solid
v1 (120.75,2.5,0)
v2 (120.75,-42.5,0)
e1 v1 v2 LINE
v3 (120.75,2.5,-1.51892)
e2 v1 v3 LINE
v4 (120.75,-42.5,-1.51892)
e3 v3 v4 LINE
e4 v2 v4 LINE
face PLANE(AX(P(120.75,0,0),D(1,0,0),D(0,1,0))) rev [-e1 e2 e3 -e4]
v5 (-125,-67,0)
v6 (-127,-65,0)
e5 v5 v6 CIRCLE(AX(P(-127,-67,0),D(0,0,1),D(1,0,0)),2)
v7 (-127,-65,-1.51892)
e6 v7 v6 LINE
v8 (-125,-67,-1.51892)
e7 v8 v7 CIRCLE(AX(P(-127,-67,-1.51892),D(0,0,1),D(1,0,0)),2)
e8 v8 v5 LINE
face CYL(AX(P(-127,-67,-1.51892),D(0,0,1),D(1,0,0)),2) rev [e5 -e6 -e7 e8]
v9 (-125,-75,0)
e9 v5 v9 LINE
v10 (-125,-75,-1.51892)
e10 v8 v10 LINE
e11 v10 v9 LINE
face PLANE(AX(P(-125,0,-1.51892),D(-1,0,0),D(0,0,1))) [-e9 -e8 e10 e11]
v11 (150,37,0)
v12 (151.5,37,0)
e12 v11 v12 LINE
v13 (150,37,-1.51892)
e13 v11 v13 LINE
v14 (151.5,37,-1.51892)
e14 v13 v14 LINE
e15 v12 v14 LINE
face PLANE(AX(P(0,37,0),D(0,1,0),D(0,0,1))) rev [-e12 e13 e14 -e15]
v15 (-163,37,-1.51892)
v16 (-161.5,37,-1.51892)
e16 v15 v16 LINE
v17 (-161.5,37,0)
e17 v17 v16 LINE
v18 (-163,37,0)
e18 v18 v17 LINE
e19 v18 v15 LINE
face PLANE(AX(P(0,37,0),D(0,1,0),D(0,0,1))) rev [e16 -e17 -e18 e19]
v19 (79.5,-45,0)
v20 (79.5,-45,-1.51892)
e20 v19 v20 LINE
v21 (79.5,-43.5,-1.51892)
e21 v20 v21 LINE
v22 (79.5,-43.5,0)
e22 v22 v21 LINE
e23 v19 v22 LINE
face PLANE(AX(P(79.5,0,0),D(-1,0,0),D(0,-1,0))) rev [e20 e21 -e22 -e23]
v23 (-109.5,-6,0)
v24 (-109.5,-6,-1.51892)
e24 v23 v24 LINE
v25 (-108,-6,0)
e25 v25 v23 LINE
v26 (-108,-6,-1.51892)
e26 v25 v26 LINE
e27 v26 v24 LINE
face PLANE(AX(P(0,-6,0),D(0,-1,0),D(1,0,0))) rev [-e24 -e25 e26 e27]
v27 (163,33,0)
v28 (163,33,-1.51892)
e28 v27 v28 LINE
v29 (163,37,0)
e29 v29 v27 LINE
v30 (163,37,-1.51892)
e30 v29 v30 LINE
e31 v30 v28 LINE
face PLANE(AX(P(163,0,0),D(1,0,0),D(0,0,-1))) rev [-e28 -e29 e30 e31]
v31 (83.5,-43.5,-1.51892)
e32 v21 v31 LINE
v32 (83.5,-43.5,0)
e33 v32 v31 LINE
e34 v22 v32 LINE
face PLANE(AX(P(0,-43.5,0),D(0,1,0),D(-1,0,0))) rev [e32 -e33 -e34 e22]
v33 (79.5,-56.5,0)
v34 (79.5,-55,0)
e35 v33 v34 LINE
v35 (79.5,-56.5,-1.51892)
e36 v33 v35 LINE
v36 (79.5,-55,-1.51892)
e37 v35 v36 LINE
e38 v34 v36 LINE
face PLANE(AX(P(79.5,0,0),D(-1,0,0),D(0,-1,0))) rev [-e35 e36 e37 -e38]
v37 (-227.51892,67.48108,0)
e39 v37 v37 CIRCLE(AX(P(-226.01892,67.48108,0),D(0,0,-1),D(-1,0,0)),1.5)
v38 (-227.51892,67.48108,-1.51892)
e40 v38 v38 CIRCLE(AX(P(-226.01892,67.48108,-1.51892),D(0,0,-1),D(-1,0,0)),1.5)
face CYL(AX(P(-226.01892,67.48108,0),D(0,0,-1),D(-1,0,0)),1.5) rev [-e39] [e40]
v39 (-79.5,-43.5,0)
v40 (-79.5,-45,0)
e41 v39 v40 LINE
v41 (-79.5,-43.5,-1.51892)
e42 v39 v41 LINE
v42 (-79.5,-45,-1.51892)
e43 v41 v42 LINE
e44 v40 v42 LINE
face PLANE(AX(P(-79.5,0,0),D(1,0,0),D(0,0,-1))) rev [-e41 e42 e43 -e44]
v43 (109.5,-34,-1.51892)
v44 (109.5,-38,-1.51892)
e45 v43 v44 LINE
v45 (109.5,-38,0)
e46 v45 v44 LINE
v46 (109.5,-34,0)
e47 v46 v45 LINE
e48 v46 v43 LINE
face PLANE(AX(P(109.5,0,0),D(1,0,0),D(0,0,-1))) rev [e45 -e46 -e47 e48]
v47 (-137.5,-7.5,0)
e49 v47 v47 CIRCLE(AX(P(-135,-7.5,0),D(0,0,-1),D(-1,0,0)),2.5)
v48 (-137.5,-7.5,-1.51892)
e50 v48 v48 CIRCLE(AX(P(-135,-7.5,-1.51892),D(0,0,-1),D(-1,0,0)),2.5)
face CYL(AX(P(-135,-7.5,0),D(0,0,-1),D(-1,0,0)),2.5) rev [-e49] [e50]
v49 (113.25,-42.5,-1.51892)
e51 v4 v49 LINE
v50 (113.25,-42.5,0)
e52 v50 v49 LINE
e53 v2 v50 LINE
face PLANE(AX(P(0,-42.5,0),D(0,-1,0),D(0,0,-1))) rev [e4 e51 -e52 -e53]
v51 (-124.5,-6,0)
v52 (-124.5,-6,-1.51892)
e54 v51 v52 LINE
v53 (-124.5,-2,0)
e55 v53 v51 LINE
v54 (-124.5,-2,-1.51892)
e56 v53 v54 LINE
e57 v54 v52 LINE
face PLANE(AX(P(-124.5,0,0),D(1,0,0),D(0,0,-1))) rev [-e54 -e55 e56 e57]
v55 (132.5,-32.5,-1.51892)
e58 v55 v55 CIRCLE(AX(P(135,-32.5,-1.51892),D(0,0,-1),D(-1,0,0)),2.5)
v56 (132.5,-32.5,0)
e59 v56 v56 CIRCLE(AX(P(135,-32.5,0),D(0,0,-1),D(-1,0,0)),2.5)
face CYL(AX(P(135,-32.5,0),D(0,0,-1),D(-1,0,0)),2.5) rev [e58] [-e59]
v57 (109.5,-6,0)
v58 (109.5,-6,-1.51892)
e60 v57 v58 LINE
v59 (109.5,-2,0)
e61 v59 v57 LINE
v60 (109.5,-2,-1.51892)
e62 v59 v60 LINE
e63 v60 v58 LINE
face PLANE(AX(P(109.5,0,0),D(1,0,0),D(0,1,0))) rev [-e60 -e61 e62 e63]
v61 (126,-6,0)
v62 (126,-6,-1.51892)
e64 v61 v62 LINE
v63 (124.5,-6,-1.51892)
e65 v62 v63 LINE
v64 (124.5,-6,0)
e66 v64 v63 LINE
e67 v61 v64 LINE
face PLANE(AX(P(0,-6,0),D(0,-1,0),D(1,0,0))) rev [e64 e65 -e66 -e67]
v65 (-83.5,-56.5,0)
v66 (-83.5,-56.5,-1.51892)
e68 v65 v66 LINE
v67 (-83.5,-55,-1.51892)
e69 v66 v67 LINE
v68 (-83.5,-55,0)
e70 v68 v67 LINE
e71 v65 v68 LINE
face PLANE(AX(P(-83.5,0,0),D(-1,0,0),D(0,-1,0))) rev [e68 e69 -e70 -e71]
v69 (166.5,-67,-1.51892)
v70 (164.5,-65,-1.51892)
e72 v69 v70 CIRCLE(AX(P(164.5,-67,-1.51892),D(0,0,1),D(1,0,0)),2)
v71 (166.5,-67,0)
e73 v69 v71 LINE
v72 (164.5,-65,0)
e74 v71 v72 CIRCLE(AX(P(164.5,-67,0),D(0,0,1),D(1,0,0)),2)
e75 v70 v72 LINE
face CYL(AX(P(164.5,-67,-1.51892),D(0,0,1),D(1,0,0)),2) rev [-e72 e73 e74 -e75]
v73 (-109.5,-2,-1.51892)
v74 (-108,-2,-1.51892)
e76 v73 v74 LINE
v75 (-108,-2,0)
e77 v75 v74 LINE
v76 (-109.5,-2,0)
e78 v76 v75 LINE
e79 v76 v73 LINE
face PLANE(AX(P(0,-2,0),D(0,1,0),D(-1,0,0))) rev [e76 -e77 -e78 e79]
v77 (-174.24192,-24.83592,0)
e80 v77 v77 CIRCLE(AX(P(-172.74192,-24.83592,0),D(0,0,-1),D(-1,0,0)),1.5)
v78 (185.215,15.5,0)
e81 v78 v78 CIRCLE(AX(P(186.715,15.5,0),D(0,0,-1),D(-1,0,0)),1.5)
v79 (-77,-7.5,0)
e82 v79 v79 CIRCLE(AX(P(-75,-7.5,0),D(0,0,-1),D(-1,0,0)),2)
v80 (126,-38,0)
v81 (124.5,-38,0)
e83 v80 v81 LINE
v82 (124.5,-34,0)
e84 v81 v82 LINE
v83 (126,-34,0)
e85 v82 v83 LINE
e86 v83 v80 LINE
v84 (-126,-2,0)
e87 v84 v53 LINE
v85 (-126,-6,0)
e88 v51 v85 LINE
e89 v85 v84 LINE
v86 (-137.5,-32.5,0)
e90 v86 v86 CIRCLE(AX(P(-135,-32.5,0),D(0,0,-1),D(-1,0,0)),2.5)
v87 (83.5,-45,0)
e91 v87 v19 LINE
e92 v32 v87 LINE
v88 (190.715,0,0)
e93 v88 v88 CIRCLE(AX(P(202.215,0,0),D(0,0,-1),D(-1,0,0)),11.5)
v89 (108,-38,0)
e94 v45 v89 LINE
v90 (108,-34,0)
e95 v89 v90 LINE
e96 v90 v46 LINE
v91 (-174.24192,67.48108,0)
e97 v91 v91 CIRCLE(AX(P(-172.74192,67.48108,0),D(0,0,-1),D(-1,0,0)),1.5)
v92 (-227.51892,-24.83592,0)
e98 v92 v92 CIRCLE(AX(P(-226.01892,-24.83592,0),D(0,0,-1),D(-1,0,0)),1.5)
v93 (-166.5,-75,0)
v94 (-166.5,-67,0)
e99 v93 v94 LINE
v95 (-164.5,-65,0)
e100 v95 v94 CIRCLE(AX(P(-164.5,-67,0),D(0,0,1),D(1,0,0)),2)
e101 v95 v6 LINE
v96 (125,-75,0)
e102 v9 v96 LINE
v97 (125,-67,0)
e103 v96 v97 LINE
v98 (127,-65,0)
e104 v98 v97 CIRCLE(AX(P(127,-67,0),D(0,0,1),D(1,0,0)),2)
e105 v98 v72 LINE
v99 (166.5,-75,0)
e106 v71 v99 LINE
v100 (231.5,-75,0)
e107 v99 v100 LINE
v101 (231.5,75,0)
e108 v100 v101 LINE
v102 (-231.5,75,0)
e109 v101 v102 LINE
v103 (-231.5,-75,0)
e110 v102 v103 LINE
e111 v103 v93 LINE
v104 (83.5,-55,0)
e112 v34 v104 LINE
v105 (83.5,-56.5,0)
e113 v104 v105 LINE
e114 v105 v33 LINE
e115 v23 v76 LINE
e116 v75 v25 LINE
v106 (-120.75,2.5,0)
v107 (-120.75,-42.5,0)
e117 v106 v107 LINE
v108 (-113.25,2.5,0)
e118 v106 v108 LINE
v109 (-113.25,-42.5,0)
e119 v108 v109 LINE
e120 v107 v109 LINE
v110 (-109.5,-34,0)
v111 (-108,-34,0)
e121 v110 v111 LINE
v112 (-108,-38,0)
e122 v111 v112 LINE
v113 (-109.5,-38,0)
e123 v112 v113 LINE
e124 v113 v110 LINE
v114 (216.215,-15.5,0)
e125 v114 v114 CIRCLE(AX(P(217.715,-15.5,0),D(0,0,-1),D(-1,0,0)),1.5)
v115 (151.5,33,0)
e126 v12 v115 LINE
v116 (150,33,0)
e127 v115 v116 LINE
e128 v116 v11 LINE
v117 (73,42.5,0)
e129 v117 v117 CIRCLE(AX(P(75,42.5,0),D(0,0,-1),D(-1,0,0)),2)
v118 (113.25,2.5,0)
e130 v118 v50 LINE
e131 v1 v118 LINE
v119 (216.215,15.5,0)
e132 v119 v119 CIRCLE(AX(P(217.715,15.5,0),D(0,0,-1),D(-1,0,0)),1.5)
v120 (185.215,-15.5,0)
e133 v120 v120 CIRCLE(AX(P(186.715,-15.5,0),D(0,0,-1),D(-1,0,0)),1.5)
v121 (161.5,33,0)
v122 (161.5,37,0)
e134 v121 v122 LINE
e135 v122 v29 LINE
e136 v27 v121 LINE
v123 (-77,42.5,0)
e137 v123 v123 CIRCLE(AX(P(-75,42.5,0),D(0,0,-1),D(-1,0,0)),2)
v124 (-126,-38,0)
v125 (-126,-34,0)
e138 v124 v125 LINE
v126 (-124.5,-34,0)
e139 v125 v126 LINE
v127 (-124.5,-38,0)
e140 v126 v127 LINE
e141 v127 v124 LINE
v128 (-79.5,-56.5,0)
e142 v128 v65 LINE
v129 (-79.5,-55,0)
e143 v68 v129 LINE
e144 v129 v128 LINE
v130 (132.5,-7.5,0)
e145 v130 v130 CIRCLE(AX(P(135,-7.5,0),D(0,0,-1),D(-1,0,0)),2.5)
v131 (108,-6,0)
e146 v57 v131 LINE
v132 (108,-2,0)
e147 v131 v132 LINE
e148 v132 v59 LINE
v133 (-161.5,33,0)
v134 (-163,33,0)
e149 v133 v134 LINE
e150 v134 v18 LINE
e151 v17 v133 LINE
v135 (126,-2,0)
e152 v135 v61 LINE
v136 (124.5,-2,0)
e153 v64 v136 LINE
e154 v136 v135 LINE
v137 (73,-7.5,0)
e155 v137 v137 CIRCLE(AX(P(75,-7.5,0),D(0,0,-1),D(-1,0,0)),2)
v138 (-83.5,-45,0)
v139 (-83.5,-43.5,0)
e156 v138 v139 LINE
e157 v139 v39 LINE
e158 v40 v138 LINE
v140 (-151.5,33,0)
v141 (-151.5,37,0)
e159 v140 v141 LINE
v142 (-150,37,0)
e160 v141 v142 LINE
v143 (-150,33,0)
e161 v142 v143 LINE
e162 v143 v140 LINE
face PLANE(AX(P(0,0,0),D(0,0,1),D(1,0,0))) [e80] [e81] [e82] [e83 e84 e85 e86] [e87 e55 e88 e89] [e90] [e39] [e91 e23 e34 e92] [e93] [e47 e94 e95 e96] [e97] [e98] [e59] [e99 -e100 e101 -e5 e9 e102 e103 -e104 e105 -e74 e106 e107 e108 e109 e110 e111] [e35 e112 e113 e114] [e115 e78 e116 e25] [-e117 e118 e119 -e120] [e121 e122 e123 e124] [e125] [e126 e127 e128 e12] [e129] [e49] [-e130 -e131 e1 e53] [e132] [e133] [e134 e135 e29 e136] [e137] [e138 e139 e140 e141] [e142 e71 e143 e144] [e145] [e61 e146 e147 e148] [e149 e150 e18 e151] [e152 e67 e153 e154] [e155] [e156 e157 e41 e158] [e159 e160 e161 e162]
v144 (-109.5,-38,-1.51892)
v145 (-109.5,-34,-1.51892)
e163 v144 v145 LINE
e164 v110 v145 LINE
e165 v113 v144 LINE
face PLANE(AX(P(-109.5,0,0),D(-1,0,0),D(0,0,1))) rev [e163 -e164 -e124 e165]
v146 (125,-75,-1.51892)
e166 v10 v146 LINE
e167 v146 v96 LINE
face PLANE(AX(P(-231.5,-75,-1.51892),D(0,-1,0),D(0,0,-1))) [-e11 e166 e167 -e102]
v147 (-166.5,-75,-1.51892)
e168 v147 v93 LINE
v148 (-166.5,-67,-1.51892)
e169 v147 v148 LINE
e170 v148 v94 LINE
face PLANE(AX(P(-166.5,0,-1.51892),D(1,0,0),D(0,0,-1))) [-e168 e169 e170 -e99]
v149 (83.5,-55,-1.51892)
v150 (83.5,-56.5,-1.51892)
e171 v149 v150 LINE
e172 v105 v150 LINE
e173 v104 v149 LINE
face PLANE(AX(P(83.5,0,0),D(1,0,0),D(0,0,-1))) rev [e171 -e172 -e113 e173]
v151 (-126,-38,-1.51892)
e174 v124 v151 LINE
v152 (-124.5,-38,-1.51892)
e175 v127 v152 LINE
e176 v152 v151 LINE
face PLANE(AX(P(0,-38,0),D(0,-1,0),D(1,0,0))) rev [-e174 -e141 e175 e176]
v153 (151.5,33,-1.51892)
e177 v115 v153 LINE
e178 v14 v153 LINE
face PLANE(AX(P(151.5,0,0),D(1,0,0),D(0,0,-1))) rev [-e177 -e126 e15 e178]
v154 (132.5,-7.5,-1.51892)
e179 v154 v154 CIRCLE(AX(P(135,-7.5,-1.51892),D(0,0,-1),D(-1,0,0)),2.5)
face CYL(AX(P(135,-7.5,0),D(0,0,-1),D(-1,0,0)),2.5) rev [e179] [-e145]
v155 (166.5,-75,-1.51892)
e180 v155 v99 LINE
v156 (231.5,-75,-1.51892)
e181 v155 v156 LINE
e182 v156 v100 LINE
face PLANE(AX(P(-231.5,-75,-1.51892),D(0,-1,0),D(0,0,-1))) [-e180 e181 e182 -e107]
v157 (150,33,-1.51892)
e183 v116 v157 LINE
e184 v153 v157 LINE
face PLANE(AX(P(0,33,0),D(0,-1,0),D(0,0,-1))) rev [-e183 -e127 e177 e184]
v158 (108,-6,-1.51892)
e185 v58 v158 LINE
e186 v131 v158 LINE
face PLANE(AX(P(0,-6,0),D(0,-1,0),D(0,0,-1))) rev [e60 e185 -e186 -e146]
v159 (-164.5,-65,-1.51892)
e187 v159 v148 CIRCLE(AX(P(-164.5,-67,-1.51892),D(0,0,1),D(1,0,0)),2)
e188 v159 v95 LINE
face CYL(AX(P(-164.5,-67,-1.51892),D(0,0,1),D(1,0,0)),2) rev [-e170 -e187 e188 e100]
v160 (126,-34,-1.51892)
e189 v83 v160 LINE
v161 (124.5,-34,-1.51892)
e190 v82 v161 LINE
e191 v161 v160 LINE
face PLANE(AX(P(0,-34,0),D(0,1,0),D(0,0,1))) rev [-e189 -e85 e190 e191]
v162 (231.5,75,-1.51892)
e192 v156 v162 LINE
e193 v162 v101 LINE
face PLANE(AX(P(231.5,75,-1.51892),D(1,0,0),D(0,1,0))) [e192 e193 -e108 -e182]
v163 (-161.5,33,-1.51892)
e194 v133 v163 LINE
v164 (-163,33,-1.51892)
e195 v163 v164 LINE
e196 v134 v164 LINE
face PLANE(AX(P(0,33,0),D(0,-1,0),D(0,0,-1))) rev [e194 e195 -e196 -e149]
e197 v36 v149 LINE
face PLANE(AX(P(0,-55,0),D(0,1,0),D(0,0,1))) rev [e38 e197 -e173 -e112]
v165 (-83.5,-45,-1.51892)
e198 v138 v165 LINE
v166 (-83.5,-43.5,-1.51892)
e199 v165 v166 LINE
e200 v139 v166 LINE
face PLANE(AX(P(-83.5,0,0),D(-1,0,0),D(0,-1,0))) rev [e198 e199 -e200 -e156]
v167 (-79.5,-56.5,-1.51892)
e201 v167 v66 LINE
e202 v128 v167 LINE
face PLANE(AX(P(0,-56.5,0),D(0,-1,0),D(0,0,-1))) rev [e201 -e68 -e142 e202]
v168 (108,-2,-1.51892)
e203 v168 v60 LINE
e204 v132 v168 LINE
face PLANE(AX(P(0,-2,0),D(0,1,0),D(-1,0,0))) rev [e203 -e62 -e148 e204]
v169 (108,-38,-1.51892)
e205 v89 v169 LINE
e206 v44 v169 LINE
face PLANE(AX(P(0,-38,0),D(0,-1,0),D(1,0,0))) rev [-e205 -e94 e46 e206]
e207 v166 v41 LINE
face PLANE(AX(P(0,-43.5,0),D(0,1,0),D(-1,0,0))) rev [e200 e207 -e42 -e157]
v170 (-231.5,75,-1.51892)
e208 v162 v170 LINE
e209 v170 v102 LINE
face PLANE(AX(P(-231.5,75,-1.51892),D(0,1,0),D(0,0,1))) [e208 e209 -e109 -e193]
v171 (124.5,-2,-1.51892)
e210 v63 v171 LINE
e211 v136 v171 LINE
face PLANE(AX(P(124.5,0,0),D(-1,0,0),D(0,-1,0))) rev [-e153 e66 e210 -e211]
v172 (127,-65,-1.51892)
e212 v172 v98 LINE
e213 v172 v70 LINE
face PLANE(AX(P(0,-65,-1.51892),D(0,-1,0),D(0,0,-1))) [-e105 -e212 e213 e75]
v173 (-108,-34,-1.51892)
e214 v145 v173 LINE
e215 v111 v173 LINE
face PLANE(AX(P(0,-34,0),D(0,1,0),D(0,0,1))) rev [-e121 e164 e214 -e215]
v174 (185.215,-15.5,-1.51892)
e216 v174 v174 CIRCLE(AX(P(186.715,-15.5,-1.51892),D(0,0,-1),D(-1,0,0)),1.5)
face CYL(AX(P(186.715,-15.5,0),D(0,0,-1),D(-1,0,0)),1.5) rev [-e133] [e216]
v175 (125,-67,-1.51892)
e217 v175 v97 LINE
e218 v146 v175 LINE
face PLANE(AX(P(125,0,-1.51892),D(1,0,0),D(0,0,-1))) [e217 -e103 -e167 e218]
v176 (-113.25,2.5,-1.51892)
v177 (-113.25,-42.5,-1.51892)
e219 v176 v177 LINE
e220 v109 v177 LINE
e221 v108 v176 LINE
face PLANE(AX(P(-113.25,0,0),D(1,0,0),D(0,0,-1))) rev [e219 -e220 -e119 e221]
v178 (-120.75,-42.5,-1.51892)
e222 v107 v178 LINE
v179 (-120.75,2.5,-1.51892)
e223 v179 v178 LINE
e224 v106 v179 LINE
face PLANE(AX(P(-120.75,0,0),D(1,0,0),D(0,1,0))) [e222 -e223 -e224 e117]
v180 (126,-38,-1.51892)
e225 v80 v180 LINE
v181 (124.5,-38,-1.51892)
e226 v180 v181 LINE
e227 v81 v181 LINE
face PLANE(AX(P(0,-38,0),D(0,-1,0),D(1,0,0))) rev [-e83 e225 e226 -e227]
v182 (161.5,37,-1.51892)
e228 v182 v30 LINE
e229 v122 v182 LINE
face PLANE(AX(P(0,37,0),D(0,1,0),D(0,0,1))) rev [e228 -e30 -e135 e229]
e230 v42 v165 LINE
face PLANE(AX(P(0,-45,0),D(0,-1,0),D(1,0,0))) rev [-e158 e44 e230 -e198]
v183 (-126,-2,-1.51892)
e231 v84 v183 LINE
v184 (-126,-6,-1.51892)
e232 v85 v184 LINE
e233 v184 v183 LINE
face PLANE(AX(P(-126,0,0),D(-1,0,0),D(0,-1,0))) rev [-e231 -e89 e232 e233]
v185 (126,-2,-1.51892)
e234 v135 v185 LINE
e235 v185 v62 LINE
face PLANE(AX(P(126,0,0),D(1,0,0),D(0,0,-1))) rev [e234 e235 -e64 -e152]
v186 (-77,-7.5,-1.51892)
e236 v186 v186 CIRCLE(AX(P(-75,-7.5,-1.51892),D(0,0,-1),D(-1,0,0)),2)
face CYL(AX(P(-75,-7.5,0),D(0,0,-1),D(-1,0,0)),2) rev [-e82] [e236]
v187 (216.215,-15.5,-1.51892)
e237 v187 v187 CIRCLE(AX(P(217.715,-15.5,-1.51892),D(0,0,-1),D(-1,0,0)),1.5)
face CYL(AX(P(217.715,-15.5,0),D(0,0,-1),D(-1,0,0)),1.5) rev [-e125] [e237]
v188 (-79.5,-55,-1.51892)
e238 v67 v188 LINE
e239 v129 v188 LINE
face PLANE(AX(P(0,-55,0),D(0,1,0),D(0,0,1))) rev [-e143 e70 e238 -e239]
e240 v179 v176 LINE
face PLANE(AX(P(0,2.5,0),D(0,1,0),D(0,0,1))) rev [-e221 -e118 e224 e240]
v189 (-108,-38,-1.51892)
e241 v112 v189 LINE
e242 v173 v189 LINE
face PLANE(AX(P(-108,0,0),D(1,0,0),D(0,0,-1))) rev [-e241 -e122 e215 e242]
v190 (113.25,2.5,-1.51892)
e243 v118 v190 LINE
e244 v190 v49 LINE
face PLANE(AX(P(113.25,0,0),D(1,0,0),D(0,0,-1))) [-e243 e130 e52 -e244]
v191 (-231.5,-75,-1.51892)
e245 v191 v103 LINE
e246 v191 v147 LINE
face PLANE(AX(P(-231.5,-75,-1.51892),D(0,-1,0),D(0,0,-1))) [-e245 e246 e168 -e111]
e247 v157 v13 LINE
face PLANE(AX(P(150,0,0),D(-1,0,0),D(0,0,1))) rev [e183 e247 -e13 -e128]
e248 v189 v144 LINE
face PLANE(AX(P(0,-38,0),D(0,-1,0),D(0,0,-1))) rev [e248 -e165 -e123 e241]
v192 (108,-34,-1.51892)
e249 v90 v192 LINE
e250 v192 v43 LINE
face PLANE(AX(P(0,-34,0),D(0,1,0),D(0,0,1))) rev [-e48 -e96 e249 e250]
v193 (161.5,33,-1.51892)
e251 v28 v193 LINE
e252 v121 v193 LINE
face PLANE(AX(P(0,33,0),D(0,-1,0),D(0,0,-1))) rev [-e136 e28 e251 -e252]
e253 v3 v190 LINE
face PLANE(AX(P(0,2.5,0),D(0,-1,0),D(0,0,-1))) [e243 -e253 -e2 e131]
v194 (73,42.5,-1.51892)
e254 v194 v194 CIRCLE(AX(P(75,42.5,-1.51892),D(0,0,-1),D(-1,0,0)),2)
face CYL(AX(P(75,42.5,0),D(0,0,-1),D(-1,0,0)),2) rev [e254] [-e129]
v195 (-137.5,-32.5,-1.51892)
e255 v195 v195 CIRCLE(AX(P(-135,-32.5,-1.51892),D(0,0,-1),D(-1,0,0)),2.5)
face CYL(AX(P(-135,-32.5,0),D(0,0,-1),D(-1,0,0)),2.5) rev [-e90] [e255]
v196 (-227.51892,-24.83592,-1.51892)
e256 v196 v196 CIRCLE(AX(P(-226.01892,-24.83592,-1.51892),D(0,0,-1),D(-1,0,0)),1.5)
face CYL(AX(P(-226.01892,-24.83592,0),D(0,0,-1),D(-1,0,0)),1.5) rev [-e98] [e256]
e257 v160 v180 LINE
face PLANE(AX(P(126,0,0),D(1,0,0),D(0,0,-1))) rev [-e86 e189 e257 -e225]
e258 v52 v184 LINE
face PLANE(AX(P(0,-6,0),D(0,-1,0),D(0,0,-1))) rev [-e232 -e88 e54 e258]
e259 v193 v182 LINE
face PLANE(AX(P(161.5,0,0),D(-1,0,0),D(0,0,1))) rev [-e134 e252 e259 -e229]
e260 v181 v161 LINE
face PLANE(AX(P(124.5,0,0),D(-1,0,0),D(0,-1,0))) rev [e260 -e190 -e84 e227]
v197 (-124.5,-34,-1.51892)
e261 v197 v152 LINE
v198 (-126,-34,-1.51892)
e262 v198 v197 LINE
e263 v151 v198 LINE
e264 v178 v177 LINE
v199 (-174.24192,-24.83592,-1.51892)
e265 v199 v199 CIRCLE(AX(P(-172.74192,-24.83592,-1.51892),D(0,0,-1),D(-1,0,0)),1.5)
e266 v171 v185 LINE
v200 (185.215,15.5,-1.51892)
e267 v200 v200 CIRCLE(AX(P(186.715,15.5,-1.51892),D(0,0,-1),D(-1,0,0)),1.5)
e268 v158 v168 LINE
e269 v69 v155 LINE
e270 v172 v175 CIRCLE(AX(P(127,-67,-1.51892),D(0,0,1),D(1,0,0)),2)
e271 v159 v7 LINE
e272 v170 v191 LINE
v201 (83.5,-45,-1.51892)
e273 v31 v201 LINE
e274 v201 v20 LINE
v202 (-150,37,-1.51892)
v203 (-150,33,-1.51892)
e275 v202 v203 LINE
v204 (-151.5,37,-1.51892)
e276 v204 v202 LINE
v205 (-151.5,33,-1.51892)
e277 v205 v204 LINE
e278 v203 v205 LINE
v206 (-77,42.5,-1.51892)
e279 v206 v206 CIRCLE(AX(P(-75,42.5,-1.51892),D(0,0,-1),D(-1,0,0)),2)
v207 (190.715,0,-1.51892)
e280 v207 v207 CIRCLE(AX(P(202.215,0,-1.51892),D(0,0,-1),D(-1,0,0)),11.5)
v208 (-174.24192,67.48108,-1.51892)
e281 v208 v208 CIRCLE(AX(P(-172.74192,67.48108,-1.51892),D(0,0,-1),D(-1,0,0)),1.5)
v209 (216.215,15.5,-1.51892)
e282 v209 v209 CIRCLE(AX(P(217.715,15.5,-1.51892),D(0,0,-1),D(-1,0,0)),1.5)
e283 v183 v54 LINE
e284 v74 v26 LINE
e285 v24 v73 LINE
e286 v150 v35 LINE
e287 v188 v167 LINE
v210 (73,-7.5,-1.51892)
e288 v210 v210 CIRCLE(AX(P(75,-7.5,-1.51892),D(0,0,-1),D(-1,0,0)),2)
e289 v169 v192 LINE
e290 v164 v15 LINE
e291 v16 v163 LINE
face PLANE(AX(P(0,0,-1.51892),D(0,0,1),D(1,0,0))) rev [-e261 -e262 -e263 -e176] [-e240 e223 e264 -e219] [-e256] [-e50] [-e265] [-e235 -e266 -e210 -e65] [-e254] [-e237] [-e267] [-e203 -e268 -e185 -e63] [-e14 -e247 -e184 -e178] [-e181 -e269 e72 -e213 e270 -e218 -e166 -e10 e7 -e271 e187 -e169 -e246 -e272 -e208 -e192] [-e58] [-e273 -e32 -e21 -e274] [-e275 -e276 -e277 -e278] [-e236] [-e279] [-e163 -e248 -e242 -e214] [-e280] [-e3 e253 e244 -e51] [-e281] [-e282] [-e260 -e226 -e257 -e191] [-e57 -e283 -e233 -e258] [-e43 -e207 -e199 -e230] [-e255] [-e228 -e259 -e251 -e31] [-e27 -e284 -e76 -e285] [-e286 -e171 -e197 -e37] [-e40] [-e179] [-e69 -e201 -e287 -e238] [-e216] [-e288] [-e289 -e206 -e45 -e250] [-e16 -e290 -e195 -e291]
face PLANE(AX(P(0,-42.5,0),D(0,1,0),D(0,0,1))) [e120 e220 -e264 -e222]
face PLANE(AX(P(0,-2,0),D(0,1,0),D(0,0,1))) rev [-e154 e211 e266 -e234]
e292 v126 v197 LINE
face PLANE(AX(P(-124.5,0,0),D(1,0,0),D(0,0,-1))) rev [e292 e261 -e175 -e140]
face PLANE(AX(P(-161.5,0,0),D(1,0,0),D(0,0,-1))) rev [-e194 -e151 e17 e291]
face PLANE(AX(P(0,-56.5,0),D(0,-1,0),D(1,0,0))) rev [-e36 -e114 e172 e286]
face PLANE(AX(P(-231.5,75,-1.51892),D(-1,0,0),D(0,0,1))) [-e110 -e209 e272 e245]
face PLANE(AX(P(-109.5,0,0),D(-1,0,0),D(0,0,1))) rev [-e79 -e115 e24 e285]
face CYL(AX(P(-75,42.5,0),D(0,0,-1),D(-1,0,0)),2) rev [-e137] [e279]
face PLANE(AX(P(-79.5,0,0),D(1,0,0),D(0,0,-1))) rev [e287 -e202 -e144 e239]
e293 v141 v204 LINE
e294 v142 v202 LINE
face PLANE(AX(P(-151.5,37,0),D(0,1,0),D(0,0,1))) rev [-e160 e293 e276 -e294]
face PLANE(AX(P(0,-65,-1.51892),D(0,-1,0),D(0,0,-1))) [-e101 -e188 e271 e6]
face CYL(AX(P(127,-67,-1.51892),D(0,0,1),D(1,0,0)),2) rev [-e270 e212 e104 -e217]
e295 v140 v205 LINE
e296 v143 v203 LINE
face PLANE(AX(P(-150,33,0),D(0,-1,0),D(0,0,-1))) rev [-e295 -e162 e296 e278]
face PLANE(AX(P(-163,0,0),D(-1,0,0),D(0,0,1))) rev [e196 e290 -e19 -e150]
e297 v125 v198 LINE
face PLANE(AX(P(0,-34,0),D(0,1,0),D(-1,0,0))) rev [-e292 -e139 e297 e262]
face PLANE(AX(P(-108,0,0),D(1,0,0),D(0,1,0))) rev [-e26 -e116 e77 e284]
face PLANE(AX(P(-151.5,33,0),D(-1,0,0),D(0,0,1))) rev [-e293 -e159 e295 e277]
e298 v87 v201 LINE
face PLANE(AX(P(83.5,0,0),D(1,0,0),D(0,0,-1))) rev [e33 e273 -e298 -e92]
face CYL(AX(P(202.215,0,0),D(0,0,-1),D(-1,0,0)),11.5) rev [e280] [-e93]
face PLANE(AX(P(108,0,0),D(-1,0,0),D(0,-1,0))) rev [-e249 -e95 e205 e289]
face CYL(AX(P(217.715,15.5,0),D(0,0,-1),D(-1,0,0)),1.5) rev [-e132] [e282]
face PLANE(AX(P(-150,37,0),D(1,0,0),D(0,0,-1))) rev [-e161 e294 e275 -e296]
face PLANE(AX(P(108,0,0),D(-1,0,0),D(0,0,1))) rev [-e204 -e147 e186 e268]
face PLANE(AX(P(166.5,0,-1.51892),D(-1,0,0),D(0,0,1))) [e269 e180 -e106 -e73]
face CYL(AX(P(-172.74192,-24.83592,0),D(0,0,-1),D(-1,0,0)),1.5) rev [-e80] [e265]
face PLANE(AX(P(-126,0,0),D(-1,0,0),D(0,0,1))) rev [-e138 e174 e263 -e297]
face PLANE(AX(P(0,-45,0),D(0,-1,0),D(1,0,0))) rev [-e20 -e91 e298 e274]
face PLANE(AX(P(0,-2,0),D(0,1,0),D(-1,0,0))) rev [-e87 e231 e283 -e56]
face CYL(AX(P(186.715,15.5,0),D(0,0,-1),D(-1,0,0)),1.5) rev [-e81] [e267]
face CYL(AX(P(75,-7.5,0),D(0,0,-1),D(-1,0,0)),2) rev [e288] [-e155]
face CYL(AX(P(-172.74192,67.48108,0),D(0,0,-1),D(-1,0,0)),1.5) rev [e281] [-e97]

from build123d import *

# Parameters (mm, degrees)
SKETCH1_W          = 463
SKETCH1_H          = 150
BASE_FLANGE1_DEPTH = 1.51892
SKETCH48_R         = 1.5
SKETCH48_R_2       = 11.5
SKETCH48_R_3       = 2.5
SKETCH48_R_4       = 2
SKETCH48_W         = 7.5
SKETCH48_H         = 45
SKETCH48_W_2       = 1.5
SKETCH48_H_2       = 4
SKETCH48_W_3       = 4
SKETCH48_H_3       = 1.5
CUT_EXTRUDE1_DEPTH = 1.51892
CUT_EXTRUDE3_DEPTH = 10


# Sheet-metal steps are written as plain solids
with BuildPart() as part:
    # Sketch1 → Base-Flange1 (new body)
    with BuildSketch(Plane.XY):
        Rectangle(SKETCH1_W, SKETCH1_H)
    extrude(amount=-BASE_FLANGE1_DEPTH)

    # Sketch48 → Cut-Extrude1 (cut)
    with BuildSketch(Plane(origin=(0, 0, -1.51892), x_dir=(-1, 0, 0), z_dir=(0, 0, -1))):
        with Locations((-186.715, -15.5)):
            Circle(SKETCH48_R)
        with Locations((-186.715, 15.5)):
            Circle(SKETCH48_R)
        with Locations((-217.715, 15.5)):
            Circle(SKETCH48_R)
        with Locations((-202.215, 0)):
            Circle(SKETCH48_R_2)
        with Locations((-217.715, -15.5)):
            Circle(SKETCH48_R)
        with Locations((-135, -7.5)):
            Circle(SKETCH48_R_3)
        with Locations((-135, -32.5)):
            Circle(SKETCH48_R_3)
        with Locations((-75, -7.5)):
            Circle(SKETCH48_R_4)
        with Locations((-75, 42.5)):
            Circle(SKETCH48_R_4)
        with Locations((135, -32.5)):
            Circle(SKETCH48_R_3)
        with Locations((135, -7.5)):
            Circle(SKETCH48_R_3)
        with Locations((75, -7.5)):
            Circle(SKETCH48_R_4)
        with Locations((75, 42.5)):
            Circle(SKETCH48_R_4)
        with Locations((172.74192, -24.83591994)):
            Circle(SKETCH48_R)
        with Locations((226.01892, -24.83591994)):
            Circle(SKETCH48_R)
        with Locations((172.74192, 67.48108)):
            Circle(SKETCH48_R)
        with Locations((226.01892, 67.48108)):
            Circle(SKETCH48_R)
        with Locations((117, -20)):
            Rectangle(SKETCH48_W, SKETCH48_H)
        with Locations((-117, -20)):
            Rectangle(SKETCH48_W, SKETCH48_H)
        with Locations((-108.75, -4)):
            Rectangle(SKETCH48_W_2, SKETCH48_H_2)
        with Locations((-125.25, -4)):
            Rectangle(SKETCH48_W_2, SKETCH48_H_2)
        with Locations((-125.25, -36)):
            Rectangle(SKETCH48_W_2, SKETCH48_H_2)
        with Locations((-108.75, -36)):
            Rectangle(SKETCH48_W_2, SKETCH48_H_2)
        with Locations((-81.5, -44.25)):
            Rectangle(SKETCH48_W_3, SKETCH48_H_3)
        with Locations((-81.5, -55.75)):
            Rectangle(SKETCH48_W_3, SKETCH48_H_3)
        with Locations((-150.75, 35)):
            Rectangle(SKETCH48_W_2, SKETCH48_H_2)
        with Locations((-162.25, 35)):
            Rectangle(SKETCH48_W_2, SKETCH48_H_2)
        with Locations((125.25, -36)):
            Rectangle(SKETCH48_W_2, SKETCH48_H_2)
        with Locations((108.75, -36)):
            Rectangle(SKETCH48_W_2, SKETCH48_H_2)
        with Locations((81.5, -44.25)):
            Rectangle(SKETCH48_W_3, SKETCH48_H_3)
        with Locations((81.5, -55.75)):
            Rectangle(SKETCH48_W_3, SKETCH48_H_3)
        with Locations((162.25, 35)):
            Rectangle(SKETCH48_W_2, SKETCH48_H_2)
        with Locations((150.75, 35)):
            Rectangle(SKETCH48_W_2, SKETCH48_H_2)
        with Locations((108.75, -4)):
            Rectangle(SKETCH48_W_2, SKETCH48_H_2)
        with Locations((125.25, -4)):
            Rectangle(SKETCH48_W_2, SKETCH48_H_2)
    extrude(amount=-CUT_EXTRUDE1_DEPTH, mode=Mode.SUBTRACT)

    # Sketch50 → Cut-Extrude3 (cut)
    with BuildSketch(Plane.XY):
        with BuildLine():
            Line((166.5, -67), (166.5, -75))
            Line((166.5, -75), (125, -75))
            Line((125, -75), (125, -67))
            ThreePointArc((125, -67), (125.585786438, -65.585786438), (127, -65))
            Line((127, -65), (164.5, -65))
            ThreePointArc((164.5, -65), (165.914213562, -65.585786438), (166.5, -67))
        make_face()
        with BuildLine():
            Line((-125, -67), (-125, -75))
            Line((-125, -75), (-166.5, -75))
            Line((-166.5, -75), (-166.5, -67))
            ThreePointArc((-166.5, -67), (-165.914213562, -65.585786438), (-164.5, -65))
            Line((-164.5, -65), (-127, -65))
            ThreePointArc((-127, -65), (-125.585786438, -65.585786438), (-125, -67))
        make_face()
    extrude(amount=-CUT_EXTRUDE3_DEPTH, mode=Mode.SUBTRACT)


solid = part.part
